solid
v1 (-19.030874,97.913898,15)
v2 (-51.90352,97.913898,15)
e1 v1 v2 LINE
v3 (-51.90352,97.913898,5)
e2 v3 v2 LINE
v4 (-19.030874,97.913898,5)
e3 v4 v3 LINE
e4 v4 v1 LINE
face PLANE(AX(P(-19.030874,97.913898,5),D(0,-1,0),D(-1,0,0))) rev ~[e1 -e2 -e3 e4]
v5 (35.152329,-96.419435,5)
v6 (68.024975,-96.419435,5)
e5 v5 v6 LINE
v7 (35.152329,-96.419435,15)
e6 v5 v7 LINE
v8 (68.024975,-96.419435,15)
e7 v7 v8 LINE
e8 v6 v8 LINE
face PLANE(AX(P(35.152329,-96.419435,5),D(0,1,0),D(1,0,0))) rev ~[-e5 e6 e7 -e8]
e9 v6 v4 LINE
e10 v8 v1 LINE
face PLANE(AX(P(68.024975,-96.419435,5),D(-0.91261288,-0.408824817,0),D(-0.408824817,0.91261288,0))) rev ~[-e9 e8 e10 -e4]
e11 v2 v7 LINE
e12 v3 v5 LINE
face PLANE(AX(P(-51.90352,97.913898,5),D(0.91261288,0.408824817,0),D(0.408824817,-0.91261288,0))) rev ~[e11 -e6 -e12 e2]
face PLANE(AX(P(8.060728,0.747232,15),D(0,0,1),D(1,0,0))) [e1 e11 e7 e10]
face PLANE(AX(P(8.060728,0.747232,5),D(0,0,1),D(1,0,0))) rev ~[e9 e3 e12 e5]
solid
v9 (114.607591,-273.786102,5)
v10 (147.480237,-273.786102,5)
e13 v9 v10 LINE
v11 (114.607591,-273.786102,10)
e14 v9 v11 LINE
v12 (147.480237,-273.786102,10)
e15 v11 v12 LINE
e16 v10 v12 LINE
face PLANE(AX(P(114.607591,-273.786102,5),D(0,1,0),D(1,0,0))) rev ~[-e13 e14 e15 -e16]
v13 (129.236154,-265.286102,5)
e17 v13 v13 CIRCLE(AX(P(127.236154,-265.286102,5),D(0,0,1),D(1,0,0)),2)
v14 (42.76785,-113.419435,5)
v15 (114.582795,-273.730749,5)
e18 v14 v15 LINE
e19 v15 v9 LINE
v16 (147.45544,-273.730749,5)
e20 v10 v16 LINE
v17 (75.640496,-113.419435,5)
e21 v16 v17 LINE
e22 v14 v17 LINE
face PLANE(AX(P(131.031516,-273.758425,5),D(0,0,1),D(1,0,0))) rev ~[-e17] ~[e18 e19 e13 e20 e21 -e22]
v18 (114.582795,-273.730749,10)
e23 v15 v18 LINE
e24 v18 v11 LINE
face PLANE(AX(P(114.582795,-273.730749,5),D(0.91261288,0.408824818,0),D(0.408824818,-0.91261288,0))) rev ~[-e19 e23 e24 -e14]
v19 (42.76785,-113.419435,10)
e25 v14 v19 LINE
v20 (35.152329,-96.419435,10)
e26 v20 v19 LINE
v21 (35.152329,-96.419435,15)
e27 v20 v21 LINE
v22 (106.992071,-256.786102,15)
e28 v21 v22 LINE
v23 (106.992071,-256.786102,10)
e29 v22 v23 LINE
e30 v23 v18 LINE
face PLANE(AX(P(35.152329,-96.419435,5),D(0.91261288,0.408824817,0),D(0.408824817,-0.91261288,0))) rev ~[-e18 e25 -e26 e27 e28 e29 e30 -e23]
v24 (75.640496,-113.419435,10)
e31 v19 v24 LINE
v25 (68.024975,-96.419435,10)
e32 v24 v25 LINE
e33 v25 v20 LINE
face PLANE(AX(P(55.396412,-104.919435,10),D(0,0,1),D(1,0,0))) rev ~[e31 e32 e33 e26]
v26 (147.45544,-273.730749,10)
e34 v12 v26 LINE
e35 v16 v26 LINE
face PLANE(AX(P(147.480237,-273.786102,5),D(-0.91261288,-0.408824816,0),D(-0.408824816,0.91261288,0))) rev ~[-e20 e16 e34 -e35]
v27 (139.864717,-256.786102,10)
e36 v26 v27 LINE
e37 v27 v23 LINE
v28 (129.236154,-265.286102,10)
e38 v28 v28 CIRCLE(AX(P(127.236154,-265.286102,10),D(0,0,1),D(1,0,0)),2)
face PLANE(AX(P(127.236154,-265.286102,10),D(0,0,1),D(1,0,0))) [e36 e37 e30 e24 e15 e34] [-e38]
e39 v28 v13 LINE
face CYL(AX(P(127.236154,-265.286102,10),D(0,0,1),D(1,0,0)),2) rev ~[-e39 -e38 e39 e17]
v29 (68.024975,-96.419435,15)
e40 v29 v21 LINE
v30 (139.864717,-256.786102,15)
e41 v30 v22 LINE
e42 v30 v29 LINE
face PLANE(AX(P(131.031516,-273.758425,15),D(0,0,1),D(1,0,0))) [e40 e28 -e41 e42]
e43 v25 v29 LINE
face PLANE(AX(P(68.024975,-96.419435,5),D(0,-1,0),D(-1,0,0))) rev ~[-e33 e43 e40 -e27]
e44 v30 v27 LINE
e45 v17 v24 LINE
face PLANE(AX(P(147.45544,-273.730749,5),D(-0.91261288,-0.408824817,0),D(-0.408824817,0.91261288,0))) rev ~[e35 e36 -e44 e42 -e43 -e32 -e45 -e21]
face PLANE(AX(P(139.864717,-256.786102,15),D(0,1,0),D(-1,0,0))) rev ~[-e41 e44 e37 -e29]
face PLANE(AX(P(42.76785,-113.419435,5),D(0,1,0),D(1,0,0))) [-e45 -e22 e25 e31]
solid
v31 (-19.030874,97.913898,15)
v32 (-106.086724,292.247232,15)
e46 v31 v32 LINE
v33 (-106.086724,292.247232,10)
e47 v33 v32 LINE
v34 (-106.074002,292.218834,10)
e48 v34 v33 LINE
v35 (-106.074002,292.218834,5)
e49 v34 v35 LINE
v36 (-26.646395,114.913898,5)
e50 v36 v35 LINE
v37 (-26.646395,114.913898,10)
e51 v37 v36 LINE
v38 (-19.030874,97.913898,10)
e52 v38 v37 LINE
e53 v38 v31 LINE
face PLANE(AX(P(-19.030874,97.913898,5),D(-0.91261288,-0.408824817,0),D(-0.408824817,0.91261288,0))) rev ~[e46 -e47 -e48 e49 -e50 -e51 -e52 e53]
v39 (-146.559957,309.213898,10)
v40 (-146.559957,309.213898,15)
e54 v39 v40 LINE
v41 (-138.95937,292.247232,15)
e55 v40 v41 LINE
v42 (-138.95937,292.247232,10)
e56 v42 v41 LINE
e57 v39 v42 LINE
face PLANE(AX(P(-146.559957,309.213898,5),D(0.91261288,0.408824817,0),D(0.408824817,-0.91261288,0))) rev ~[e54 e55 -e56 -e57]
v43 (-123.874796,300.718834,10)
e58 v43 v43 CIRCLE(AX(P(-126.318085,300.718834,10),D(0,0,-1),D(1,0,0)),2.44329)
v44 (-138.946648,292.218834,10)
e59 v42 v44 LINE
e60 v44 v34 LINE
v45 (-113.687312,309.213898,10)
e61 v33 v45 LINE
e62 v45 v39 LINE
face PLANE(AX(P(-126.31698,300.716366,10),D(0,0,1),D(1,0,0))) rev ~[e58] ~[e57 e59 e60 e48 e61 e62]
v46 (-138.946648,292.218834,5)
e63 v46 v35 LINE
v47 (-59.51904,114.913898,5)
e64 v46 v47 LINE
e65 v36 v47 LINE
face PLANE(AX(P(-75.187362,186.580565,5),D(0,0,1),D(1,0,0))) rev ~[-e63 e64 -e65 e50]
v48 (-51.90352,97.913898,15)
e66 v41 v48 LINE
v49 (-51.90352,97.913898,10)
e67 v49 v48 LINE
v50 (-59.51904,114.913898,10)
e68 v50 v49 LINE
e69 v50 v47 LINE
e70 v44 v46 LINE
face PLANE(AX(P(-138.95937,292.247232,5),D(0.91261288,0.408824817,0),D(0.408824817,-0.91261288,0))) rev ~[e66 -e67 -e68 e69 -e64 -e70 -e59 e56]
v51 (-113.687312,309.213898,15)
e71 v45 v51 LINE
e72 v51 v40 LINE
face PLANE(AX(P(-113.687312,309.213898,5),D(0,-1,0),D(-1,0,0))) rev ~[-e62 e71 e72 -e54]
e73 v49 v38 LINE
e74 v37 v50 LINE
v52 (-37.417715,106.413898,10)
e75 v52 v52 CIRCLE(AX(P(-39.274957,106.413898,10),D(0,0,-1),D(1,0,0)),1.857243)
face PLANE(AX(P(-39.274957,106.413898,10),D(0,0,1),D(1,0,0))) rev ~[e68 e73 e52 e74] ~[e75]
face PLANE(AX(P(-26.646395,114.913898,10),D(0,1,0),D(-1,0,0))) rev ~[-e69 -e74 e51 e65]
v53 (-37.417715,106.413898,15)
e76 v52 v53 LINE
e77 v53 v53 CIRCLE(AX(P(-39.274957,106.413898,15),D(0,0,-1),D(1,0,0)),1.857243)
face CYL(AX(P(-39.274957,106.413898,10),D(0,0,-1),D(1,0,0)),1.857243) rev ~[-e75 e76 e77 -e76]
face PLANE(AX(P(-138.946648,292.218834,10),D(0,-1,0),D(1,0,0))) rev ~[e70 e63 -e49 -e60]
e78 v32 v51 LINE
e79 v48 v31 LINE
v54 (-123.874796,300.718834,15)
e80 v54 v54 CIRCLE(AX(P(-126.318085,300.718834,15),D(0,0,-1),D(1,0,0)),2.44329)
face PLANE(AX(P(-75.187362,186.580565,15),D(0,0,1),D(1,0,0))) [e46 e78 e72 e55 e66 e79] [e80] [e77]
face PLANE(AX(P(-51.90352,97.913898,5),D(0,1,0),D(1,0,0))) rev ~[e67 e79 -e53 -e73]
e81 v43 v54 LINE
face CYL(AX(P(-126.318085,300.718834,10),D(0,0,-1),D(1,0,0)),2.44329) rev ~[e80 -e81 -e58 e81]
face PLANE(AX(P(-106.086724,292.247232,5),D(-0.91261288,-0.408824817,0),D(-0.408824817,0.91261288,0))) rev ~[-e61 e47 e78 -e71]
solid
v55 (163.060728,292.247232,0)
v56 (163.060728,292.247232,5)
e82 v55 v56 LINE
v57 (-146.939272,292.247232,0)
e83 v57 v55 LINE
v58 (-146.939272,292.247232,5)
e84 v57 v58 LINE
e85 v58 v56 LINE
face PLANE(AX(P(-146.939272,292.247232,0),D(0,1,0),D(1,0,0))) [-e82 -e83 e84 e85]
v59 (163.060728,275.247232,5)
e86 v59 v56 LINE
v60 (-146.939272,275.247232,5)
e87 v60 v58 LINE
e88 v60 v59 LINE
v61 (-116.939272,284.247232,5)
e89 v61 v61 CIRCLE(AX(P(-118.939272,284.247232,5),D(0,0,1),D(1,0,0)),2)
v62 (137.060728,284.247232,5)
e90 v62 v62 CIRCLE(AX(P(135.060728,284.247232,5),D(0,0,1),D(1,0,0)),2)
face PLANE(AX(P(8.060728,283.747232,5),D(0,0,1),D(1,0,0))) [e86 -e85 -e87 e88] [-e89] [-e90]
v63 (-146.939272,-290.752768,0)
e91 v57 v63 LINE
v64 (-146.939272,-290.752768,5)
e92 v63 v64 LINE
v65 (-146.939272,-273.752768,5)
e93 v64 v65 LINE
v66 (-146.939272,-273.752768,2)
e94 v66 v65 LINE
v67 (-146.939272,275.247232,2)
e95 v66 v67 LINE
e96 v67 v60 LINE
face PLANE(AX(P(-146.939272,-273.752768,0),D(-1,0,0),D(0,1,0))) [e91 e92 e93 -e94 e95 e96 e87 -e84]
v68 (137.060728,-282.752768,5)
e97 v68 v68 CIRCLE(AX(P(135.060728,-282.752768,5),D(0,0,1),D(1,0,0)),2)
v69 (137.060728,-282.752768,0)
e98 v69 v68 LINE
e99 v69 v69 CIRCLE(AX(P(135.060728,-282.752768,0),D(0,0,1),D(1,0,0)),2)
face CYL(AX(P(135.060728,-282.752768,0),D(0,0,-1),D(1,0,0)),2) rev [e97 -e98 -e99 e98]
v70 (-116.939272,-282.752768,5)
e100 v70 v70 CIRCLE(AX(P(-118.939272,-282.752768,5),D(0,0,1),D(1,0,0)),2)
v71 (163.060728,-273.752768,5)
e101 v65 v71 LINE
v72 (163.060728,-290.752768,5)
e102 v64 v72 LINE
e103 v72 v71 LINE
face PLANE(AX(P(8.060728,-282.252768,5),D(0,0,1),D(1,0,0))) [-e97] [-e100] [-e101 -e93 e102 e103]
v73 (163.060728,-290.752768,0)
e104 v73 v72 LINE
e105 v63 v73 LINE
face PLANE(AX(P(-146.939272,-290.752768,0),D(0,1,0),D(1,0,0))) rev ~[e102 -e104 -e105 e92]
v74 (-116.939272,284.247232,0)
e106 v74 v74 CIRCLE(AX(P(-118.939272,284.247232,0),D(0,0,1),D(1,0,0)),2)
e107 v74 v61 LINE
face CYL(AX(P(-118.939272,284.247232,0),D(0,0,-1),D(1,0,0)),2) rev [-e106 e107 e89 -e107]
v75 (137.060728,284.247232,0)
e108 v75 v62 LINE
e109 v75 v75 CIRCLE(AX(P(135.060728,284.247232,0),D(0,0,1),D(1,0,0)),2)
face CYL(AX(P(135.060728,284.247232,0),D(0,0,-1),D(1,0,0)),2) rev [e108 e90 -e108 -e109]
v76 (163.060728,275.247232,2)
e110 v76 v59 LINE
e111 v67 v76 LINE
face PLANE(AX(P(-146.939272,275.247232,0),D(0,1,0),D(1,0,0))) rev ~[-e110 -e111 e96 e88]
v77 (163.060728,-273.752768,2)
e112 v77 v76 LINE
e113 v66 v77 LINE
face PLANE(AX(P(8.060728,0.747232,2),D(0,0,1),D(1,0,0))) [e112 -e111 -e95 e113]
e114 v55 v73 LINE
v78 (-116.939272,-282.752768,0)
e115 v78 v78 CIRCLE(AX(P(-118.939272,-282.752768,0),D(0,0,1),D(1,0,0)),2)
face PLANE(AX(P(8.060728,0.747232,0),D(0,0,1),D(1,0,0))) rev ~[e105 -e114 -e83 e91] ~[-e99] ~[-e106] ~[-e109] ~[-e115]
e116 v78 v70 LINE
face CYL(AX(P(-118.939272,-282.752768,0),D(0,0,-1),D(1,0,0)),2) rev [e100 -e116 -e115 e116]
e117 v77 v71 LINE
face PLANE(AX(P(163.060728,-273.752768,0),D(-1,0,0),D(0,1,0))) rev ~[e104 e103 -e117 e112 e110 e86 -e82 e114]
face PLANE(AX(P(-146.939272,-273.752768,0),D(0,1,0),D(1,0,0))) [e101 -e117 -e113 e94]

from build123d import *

# Parameters (mm, degrees)
F0_W      = 310
F0_H      = 17
F0_R      = 2
F1_DEPTH  = 5
F0_H_2    = 549
F2_DEPTH  = 2
F4_DEPTH  = 10
F3_R      = 2
F6_DEPTH  = 5
F8_DEPTH  = 5
F9_R      = 2
F10_DEPTH = 25
F12_START = -5
F12_DEPTH = 5
F13_DEPTH = 10
F14_DEPTH = 5
F15_R     = 2.4432897083
F16_DEPTH = 25
F17_R     = 1.8572425824
F18_DEPTH = 25


# Not quite as in the source:
# - a feature names something its author has since deleted; it is built from what else it names


with BuildPart() as f1:
    # F0 (on Top) → F1 (new body)
    with BuildSketch(Plane.XY):
        with Locations((8.0607275963, 283.7472317666)):
            Rectangle(F0_W, F0_H)
        with Locations((-118.9392724037, 284.2472317666)):
            Circle(F0_R, mode=Mode.SUBTRACT)
        with Locations((135.0607275963, 284.2472317666)):
            Circle(F0_R, mode=Mode.SUBTRACT)
    extrude(amount=F1_DEPTH)



with BuildPart() as f1b:
    # F0 (on Top) → F1, piece 2 (new body)
    with BuildSketch(Plane.XY):
        with Locations((8.0607275963, -282.2527682334)):
            Rectangle(F0_W, F0_H)
        with Locations((-118.9392724037, -282.7527682334)):
            Circle(F0_R, mode=Mode.SUBTRACT)
        with Locations((135.0607275963, -282.7527682334)):
            Circle(F0_R, mode=Mode.SUBTRACT)
    extrude(amount=F1_DEPTH)


with BuildPart() as f1_1:
    add(f1.part)

    add(f1b.part)  # F2 merges F1b
    # F0 (on Top) → F2 (join)
    with BuildSketch(Plane.XY):
        with Locations((8.0607275963, 0.7472317666)):
            Rectangle(F0_W, F0_H_2)
    extrude(amount=F2_DEPTH)

    # F11 (on face) → F14 (cut)
    with BuildSketch(Plane.XY.offset(15)):
        Polygon((-19.030874229, 97.9138984332), (-26.6463945112, 114.9138984332), (-59.5190403609, 114.9138984332), (-51.9035200787, 97.9138984332), align=None)
        Polygon((-95.7537963986, 309.2138984332), (-113.6873116188, 309.2138984332), (-106.0740024037, 292.2188341618), (-95.7537963986, 292.2188341618), align=None)
        Polygon((-106.0740024037, 292.2188341618), (-113.6873116188, 309.2138984332), (-146.5599574685, 309.2138984332), (-138.9466482534, 292.2188341618), align=None)
        Polygon((-138.9466482534, 292.2188341618), (-146.5599574685, 309.2138984332), (-168.3874875307, 309.2138984332), (-168.3874875307, 292.2188341618), align=None)
    extrude(amount=F14_DEPTH, mode=Mode.SUBTRACT)


with BuildPart() as f4:
    # F3 (on face) → F4 (new body)
    with BuildSketch(Plane.XY.offset(5)):
        Polygon((147.4554403895, -273.7307487662), (114.5827945397, -273.7307487662), (114.6075910324, -273.7861015668), (147.4802368821, -273.7861015668), align=None)
        Polygon((68.0249752713, -96.4194349001), (35.1523294216, -96.4194349001), (114.5827945397, -273.7307487662), (147.4554403895, -273.7307487662), align=None)
    extrude(amount=F4_DEPTH)

    # F5 (on face) → F6 (cut)
    with BuildSketch(Plane.XY.offset(15)):
        Polygon((114.6075910324, -273.7861015668), (147.4802368821, -273.7861015668), (139.8647165999, -256.7861015668), (106.9920707502, -256.7861015668), align=None)
    extrude(amount=-F6_DEPTH, mode=Mode.SUBTRACT)

    # F7 (on face) → F8 (cut)
    with BuildSketch(Plane.XY.offset(5)):
        Polygon((68.0249752713, -96.4194349001), (35.1523294216, -96.4194349001), (42.7678497038, -113.4194349001), (75.6404955535, -113.4194349001), align=None)
    extrude(amount=F8_DEPTH, mode=Mode.SUBTRACT)

    # F9 (on face) → F10 (cut)
    with BuildSketch(Plane.XY.offset(10)):
        with Locations((127.2361538162, -265.2861015668)):
            Circle(F9_R)
    extrude(amount=-F10_DEPTH, mode=Mode.SUBTRACT)


with BuildPart() as f4b:
    # F3 (on face) → F4, piece 2 (new body)
    with BuildSketch(Plane.XY.offset(5)):
        Polygon((-131.3438492968, 275.2472317666), (-51.9035200787, 97.9138984332), (-19.030874229, 97.9138984332), (-98.4712034471, 275.2472317666), align=None)
        Polygon((-138.959369579, 292.2472317666), (-131.3438492968, 275.2472317666), (-98.4712034471, 275.2472317666), (-106.0867237293, 292.2472317666), align=None)
        with Locations((-118.9392724037, 284.2472317666)):
            Circle(F3_R, mode=Mode.SUBTRACT)
        Polygon((-146.5599574685, 309.2138984332), (-138.959369579, 292.2472317666), (-106.0867237293, 292.2472317666), (-113.6873116188, 309.2138984332), align=None)
        with Locations((-118.9392724037, 284.2472317666)):
            Circle(F3_R)
    extrude(amount=F4_DEPTH)

    # F11 (on face) → F12 (cut)
    with BuildSketch(Plane.XY.offset(15).offset(F12_START)):
        Polygon((-19.030874229, 97.9138984332), (-26.6463945112, 114.9138984332), (-59.5190403609, 114.9138984332), (-51.9035200787, 97.9138984332), align=None)
        Polygon((-106.0740024037, 292.2188341618), (-113.6873116188, 309.2138984332), (-146.5599574685, 309.2138984332), (-138.9466482534, 292.2188341618), align=None)
    extrude(amount=-F12_DEPTH, mode=Mode.SUBTRACT)

    # F15 (on face) → F16 (cut)
    with BuildSketch(Plane(origin=(0, 0, 10), x_dir=(1, 0, 0), z_dir=(0, 0, -1))):
        with Locations((-126.3180854696, -300.7188341618)):
            Circle(F15_R)
    extrude(amount=-F16_DEPTH, mode=Mode.SUBTRACT)

    # F17 (on face) → F18 (cut)
    with BuildSketch(Plane(origin=(0, 0, 10), x_dir=(1, 0, 0), z_dir=(0, 0, -1))):
        with Locations((-39.274957295, -106.4138984332)):
            Circle(F17_R)
    extrude(amount=-F18_DEPTH, mode=Mode.SUBTRACT)


with BuildPart() as f13:
    # F3 (on face) → F13 (new body)
    with BuildSketch(Plane.XY.offset(5)):
        Polygon((-19.030874229, 97.9138984332), (-51.9035200787, 97.9138984332), (35.1523294216, -96.4194349001), (68.0249752713, -96.4194349001), align=None)
    extrude(amount=F13_DEPTH)


solid = Compound([f1_1.part, f4.part, f4b.part, f13.part])
